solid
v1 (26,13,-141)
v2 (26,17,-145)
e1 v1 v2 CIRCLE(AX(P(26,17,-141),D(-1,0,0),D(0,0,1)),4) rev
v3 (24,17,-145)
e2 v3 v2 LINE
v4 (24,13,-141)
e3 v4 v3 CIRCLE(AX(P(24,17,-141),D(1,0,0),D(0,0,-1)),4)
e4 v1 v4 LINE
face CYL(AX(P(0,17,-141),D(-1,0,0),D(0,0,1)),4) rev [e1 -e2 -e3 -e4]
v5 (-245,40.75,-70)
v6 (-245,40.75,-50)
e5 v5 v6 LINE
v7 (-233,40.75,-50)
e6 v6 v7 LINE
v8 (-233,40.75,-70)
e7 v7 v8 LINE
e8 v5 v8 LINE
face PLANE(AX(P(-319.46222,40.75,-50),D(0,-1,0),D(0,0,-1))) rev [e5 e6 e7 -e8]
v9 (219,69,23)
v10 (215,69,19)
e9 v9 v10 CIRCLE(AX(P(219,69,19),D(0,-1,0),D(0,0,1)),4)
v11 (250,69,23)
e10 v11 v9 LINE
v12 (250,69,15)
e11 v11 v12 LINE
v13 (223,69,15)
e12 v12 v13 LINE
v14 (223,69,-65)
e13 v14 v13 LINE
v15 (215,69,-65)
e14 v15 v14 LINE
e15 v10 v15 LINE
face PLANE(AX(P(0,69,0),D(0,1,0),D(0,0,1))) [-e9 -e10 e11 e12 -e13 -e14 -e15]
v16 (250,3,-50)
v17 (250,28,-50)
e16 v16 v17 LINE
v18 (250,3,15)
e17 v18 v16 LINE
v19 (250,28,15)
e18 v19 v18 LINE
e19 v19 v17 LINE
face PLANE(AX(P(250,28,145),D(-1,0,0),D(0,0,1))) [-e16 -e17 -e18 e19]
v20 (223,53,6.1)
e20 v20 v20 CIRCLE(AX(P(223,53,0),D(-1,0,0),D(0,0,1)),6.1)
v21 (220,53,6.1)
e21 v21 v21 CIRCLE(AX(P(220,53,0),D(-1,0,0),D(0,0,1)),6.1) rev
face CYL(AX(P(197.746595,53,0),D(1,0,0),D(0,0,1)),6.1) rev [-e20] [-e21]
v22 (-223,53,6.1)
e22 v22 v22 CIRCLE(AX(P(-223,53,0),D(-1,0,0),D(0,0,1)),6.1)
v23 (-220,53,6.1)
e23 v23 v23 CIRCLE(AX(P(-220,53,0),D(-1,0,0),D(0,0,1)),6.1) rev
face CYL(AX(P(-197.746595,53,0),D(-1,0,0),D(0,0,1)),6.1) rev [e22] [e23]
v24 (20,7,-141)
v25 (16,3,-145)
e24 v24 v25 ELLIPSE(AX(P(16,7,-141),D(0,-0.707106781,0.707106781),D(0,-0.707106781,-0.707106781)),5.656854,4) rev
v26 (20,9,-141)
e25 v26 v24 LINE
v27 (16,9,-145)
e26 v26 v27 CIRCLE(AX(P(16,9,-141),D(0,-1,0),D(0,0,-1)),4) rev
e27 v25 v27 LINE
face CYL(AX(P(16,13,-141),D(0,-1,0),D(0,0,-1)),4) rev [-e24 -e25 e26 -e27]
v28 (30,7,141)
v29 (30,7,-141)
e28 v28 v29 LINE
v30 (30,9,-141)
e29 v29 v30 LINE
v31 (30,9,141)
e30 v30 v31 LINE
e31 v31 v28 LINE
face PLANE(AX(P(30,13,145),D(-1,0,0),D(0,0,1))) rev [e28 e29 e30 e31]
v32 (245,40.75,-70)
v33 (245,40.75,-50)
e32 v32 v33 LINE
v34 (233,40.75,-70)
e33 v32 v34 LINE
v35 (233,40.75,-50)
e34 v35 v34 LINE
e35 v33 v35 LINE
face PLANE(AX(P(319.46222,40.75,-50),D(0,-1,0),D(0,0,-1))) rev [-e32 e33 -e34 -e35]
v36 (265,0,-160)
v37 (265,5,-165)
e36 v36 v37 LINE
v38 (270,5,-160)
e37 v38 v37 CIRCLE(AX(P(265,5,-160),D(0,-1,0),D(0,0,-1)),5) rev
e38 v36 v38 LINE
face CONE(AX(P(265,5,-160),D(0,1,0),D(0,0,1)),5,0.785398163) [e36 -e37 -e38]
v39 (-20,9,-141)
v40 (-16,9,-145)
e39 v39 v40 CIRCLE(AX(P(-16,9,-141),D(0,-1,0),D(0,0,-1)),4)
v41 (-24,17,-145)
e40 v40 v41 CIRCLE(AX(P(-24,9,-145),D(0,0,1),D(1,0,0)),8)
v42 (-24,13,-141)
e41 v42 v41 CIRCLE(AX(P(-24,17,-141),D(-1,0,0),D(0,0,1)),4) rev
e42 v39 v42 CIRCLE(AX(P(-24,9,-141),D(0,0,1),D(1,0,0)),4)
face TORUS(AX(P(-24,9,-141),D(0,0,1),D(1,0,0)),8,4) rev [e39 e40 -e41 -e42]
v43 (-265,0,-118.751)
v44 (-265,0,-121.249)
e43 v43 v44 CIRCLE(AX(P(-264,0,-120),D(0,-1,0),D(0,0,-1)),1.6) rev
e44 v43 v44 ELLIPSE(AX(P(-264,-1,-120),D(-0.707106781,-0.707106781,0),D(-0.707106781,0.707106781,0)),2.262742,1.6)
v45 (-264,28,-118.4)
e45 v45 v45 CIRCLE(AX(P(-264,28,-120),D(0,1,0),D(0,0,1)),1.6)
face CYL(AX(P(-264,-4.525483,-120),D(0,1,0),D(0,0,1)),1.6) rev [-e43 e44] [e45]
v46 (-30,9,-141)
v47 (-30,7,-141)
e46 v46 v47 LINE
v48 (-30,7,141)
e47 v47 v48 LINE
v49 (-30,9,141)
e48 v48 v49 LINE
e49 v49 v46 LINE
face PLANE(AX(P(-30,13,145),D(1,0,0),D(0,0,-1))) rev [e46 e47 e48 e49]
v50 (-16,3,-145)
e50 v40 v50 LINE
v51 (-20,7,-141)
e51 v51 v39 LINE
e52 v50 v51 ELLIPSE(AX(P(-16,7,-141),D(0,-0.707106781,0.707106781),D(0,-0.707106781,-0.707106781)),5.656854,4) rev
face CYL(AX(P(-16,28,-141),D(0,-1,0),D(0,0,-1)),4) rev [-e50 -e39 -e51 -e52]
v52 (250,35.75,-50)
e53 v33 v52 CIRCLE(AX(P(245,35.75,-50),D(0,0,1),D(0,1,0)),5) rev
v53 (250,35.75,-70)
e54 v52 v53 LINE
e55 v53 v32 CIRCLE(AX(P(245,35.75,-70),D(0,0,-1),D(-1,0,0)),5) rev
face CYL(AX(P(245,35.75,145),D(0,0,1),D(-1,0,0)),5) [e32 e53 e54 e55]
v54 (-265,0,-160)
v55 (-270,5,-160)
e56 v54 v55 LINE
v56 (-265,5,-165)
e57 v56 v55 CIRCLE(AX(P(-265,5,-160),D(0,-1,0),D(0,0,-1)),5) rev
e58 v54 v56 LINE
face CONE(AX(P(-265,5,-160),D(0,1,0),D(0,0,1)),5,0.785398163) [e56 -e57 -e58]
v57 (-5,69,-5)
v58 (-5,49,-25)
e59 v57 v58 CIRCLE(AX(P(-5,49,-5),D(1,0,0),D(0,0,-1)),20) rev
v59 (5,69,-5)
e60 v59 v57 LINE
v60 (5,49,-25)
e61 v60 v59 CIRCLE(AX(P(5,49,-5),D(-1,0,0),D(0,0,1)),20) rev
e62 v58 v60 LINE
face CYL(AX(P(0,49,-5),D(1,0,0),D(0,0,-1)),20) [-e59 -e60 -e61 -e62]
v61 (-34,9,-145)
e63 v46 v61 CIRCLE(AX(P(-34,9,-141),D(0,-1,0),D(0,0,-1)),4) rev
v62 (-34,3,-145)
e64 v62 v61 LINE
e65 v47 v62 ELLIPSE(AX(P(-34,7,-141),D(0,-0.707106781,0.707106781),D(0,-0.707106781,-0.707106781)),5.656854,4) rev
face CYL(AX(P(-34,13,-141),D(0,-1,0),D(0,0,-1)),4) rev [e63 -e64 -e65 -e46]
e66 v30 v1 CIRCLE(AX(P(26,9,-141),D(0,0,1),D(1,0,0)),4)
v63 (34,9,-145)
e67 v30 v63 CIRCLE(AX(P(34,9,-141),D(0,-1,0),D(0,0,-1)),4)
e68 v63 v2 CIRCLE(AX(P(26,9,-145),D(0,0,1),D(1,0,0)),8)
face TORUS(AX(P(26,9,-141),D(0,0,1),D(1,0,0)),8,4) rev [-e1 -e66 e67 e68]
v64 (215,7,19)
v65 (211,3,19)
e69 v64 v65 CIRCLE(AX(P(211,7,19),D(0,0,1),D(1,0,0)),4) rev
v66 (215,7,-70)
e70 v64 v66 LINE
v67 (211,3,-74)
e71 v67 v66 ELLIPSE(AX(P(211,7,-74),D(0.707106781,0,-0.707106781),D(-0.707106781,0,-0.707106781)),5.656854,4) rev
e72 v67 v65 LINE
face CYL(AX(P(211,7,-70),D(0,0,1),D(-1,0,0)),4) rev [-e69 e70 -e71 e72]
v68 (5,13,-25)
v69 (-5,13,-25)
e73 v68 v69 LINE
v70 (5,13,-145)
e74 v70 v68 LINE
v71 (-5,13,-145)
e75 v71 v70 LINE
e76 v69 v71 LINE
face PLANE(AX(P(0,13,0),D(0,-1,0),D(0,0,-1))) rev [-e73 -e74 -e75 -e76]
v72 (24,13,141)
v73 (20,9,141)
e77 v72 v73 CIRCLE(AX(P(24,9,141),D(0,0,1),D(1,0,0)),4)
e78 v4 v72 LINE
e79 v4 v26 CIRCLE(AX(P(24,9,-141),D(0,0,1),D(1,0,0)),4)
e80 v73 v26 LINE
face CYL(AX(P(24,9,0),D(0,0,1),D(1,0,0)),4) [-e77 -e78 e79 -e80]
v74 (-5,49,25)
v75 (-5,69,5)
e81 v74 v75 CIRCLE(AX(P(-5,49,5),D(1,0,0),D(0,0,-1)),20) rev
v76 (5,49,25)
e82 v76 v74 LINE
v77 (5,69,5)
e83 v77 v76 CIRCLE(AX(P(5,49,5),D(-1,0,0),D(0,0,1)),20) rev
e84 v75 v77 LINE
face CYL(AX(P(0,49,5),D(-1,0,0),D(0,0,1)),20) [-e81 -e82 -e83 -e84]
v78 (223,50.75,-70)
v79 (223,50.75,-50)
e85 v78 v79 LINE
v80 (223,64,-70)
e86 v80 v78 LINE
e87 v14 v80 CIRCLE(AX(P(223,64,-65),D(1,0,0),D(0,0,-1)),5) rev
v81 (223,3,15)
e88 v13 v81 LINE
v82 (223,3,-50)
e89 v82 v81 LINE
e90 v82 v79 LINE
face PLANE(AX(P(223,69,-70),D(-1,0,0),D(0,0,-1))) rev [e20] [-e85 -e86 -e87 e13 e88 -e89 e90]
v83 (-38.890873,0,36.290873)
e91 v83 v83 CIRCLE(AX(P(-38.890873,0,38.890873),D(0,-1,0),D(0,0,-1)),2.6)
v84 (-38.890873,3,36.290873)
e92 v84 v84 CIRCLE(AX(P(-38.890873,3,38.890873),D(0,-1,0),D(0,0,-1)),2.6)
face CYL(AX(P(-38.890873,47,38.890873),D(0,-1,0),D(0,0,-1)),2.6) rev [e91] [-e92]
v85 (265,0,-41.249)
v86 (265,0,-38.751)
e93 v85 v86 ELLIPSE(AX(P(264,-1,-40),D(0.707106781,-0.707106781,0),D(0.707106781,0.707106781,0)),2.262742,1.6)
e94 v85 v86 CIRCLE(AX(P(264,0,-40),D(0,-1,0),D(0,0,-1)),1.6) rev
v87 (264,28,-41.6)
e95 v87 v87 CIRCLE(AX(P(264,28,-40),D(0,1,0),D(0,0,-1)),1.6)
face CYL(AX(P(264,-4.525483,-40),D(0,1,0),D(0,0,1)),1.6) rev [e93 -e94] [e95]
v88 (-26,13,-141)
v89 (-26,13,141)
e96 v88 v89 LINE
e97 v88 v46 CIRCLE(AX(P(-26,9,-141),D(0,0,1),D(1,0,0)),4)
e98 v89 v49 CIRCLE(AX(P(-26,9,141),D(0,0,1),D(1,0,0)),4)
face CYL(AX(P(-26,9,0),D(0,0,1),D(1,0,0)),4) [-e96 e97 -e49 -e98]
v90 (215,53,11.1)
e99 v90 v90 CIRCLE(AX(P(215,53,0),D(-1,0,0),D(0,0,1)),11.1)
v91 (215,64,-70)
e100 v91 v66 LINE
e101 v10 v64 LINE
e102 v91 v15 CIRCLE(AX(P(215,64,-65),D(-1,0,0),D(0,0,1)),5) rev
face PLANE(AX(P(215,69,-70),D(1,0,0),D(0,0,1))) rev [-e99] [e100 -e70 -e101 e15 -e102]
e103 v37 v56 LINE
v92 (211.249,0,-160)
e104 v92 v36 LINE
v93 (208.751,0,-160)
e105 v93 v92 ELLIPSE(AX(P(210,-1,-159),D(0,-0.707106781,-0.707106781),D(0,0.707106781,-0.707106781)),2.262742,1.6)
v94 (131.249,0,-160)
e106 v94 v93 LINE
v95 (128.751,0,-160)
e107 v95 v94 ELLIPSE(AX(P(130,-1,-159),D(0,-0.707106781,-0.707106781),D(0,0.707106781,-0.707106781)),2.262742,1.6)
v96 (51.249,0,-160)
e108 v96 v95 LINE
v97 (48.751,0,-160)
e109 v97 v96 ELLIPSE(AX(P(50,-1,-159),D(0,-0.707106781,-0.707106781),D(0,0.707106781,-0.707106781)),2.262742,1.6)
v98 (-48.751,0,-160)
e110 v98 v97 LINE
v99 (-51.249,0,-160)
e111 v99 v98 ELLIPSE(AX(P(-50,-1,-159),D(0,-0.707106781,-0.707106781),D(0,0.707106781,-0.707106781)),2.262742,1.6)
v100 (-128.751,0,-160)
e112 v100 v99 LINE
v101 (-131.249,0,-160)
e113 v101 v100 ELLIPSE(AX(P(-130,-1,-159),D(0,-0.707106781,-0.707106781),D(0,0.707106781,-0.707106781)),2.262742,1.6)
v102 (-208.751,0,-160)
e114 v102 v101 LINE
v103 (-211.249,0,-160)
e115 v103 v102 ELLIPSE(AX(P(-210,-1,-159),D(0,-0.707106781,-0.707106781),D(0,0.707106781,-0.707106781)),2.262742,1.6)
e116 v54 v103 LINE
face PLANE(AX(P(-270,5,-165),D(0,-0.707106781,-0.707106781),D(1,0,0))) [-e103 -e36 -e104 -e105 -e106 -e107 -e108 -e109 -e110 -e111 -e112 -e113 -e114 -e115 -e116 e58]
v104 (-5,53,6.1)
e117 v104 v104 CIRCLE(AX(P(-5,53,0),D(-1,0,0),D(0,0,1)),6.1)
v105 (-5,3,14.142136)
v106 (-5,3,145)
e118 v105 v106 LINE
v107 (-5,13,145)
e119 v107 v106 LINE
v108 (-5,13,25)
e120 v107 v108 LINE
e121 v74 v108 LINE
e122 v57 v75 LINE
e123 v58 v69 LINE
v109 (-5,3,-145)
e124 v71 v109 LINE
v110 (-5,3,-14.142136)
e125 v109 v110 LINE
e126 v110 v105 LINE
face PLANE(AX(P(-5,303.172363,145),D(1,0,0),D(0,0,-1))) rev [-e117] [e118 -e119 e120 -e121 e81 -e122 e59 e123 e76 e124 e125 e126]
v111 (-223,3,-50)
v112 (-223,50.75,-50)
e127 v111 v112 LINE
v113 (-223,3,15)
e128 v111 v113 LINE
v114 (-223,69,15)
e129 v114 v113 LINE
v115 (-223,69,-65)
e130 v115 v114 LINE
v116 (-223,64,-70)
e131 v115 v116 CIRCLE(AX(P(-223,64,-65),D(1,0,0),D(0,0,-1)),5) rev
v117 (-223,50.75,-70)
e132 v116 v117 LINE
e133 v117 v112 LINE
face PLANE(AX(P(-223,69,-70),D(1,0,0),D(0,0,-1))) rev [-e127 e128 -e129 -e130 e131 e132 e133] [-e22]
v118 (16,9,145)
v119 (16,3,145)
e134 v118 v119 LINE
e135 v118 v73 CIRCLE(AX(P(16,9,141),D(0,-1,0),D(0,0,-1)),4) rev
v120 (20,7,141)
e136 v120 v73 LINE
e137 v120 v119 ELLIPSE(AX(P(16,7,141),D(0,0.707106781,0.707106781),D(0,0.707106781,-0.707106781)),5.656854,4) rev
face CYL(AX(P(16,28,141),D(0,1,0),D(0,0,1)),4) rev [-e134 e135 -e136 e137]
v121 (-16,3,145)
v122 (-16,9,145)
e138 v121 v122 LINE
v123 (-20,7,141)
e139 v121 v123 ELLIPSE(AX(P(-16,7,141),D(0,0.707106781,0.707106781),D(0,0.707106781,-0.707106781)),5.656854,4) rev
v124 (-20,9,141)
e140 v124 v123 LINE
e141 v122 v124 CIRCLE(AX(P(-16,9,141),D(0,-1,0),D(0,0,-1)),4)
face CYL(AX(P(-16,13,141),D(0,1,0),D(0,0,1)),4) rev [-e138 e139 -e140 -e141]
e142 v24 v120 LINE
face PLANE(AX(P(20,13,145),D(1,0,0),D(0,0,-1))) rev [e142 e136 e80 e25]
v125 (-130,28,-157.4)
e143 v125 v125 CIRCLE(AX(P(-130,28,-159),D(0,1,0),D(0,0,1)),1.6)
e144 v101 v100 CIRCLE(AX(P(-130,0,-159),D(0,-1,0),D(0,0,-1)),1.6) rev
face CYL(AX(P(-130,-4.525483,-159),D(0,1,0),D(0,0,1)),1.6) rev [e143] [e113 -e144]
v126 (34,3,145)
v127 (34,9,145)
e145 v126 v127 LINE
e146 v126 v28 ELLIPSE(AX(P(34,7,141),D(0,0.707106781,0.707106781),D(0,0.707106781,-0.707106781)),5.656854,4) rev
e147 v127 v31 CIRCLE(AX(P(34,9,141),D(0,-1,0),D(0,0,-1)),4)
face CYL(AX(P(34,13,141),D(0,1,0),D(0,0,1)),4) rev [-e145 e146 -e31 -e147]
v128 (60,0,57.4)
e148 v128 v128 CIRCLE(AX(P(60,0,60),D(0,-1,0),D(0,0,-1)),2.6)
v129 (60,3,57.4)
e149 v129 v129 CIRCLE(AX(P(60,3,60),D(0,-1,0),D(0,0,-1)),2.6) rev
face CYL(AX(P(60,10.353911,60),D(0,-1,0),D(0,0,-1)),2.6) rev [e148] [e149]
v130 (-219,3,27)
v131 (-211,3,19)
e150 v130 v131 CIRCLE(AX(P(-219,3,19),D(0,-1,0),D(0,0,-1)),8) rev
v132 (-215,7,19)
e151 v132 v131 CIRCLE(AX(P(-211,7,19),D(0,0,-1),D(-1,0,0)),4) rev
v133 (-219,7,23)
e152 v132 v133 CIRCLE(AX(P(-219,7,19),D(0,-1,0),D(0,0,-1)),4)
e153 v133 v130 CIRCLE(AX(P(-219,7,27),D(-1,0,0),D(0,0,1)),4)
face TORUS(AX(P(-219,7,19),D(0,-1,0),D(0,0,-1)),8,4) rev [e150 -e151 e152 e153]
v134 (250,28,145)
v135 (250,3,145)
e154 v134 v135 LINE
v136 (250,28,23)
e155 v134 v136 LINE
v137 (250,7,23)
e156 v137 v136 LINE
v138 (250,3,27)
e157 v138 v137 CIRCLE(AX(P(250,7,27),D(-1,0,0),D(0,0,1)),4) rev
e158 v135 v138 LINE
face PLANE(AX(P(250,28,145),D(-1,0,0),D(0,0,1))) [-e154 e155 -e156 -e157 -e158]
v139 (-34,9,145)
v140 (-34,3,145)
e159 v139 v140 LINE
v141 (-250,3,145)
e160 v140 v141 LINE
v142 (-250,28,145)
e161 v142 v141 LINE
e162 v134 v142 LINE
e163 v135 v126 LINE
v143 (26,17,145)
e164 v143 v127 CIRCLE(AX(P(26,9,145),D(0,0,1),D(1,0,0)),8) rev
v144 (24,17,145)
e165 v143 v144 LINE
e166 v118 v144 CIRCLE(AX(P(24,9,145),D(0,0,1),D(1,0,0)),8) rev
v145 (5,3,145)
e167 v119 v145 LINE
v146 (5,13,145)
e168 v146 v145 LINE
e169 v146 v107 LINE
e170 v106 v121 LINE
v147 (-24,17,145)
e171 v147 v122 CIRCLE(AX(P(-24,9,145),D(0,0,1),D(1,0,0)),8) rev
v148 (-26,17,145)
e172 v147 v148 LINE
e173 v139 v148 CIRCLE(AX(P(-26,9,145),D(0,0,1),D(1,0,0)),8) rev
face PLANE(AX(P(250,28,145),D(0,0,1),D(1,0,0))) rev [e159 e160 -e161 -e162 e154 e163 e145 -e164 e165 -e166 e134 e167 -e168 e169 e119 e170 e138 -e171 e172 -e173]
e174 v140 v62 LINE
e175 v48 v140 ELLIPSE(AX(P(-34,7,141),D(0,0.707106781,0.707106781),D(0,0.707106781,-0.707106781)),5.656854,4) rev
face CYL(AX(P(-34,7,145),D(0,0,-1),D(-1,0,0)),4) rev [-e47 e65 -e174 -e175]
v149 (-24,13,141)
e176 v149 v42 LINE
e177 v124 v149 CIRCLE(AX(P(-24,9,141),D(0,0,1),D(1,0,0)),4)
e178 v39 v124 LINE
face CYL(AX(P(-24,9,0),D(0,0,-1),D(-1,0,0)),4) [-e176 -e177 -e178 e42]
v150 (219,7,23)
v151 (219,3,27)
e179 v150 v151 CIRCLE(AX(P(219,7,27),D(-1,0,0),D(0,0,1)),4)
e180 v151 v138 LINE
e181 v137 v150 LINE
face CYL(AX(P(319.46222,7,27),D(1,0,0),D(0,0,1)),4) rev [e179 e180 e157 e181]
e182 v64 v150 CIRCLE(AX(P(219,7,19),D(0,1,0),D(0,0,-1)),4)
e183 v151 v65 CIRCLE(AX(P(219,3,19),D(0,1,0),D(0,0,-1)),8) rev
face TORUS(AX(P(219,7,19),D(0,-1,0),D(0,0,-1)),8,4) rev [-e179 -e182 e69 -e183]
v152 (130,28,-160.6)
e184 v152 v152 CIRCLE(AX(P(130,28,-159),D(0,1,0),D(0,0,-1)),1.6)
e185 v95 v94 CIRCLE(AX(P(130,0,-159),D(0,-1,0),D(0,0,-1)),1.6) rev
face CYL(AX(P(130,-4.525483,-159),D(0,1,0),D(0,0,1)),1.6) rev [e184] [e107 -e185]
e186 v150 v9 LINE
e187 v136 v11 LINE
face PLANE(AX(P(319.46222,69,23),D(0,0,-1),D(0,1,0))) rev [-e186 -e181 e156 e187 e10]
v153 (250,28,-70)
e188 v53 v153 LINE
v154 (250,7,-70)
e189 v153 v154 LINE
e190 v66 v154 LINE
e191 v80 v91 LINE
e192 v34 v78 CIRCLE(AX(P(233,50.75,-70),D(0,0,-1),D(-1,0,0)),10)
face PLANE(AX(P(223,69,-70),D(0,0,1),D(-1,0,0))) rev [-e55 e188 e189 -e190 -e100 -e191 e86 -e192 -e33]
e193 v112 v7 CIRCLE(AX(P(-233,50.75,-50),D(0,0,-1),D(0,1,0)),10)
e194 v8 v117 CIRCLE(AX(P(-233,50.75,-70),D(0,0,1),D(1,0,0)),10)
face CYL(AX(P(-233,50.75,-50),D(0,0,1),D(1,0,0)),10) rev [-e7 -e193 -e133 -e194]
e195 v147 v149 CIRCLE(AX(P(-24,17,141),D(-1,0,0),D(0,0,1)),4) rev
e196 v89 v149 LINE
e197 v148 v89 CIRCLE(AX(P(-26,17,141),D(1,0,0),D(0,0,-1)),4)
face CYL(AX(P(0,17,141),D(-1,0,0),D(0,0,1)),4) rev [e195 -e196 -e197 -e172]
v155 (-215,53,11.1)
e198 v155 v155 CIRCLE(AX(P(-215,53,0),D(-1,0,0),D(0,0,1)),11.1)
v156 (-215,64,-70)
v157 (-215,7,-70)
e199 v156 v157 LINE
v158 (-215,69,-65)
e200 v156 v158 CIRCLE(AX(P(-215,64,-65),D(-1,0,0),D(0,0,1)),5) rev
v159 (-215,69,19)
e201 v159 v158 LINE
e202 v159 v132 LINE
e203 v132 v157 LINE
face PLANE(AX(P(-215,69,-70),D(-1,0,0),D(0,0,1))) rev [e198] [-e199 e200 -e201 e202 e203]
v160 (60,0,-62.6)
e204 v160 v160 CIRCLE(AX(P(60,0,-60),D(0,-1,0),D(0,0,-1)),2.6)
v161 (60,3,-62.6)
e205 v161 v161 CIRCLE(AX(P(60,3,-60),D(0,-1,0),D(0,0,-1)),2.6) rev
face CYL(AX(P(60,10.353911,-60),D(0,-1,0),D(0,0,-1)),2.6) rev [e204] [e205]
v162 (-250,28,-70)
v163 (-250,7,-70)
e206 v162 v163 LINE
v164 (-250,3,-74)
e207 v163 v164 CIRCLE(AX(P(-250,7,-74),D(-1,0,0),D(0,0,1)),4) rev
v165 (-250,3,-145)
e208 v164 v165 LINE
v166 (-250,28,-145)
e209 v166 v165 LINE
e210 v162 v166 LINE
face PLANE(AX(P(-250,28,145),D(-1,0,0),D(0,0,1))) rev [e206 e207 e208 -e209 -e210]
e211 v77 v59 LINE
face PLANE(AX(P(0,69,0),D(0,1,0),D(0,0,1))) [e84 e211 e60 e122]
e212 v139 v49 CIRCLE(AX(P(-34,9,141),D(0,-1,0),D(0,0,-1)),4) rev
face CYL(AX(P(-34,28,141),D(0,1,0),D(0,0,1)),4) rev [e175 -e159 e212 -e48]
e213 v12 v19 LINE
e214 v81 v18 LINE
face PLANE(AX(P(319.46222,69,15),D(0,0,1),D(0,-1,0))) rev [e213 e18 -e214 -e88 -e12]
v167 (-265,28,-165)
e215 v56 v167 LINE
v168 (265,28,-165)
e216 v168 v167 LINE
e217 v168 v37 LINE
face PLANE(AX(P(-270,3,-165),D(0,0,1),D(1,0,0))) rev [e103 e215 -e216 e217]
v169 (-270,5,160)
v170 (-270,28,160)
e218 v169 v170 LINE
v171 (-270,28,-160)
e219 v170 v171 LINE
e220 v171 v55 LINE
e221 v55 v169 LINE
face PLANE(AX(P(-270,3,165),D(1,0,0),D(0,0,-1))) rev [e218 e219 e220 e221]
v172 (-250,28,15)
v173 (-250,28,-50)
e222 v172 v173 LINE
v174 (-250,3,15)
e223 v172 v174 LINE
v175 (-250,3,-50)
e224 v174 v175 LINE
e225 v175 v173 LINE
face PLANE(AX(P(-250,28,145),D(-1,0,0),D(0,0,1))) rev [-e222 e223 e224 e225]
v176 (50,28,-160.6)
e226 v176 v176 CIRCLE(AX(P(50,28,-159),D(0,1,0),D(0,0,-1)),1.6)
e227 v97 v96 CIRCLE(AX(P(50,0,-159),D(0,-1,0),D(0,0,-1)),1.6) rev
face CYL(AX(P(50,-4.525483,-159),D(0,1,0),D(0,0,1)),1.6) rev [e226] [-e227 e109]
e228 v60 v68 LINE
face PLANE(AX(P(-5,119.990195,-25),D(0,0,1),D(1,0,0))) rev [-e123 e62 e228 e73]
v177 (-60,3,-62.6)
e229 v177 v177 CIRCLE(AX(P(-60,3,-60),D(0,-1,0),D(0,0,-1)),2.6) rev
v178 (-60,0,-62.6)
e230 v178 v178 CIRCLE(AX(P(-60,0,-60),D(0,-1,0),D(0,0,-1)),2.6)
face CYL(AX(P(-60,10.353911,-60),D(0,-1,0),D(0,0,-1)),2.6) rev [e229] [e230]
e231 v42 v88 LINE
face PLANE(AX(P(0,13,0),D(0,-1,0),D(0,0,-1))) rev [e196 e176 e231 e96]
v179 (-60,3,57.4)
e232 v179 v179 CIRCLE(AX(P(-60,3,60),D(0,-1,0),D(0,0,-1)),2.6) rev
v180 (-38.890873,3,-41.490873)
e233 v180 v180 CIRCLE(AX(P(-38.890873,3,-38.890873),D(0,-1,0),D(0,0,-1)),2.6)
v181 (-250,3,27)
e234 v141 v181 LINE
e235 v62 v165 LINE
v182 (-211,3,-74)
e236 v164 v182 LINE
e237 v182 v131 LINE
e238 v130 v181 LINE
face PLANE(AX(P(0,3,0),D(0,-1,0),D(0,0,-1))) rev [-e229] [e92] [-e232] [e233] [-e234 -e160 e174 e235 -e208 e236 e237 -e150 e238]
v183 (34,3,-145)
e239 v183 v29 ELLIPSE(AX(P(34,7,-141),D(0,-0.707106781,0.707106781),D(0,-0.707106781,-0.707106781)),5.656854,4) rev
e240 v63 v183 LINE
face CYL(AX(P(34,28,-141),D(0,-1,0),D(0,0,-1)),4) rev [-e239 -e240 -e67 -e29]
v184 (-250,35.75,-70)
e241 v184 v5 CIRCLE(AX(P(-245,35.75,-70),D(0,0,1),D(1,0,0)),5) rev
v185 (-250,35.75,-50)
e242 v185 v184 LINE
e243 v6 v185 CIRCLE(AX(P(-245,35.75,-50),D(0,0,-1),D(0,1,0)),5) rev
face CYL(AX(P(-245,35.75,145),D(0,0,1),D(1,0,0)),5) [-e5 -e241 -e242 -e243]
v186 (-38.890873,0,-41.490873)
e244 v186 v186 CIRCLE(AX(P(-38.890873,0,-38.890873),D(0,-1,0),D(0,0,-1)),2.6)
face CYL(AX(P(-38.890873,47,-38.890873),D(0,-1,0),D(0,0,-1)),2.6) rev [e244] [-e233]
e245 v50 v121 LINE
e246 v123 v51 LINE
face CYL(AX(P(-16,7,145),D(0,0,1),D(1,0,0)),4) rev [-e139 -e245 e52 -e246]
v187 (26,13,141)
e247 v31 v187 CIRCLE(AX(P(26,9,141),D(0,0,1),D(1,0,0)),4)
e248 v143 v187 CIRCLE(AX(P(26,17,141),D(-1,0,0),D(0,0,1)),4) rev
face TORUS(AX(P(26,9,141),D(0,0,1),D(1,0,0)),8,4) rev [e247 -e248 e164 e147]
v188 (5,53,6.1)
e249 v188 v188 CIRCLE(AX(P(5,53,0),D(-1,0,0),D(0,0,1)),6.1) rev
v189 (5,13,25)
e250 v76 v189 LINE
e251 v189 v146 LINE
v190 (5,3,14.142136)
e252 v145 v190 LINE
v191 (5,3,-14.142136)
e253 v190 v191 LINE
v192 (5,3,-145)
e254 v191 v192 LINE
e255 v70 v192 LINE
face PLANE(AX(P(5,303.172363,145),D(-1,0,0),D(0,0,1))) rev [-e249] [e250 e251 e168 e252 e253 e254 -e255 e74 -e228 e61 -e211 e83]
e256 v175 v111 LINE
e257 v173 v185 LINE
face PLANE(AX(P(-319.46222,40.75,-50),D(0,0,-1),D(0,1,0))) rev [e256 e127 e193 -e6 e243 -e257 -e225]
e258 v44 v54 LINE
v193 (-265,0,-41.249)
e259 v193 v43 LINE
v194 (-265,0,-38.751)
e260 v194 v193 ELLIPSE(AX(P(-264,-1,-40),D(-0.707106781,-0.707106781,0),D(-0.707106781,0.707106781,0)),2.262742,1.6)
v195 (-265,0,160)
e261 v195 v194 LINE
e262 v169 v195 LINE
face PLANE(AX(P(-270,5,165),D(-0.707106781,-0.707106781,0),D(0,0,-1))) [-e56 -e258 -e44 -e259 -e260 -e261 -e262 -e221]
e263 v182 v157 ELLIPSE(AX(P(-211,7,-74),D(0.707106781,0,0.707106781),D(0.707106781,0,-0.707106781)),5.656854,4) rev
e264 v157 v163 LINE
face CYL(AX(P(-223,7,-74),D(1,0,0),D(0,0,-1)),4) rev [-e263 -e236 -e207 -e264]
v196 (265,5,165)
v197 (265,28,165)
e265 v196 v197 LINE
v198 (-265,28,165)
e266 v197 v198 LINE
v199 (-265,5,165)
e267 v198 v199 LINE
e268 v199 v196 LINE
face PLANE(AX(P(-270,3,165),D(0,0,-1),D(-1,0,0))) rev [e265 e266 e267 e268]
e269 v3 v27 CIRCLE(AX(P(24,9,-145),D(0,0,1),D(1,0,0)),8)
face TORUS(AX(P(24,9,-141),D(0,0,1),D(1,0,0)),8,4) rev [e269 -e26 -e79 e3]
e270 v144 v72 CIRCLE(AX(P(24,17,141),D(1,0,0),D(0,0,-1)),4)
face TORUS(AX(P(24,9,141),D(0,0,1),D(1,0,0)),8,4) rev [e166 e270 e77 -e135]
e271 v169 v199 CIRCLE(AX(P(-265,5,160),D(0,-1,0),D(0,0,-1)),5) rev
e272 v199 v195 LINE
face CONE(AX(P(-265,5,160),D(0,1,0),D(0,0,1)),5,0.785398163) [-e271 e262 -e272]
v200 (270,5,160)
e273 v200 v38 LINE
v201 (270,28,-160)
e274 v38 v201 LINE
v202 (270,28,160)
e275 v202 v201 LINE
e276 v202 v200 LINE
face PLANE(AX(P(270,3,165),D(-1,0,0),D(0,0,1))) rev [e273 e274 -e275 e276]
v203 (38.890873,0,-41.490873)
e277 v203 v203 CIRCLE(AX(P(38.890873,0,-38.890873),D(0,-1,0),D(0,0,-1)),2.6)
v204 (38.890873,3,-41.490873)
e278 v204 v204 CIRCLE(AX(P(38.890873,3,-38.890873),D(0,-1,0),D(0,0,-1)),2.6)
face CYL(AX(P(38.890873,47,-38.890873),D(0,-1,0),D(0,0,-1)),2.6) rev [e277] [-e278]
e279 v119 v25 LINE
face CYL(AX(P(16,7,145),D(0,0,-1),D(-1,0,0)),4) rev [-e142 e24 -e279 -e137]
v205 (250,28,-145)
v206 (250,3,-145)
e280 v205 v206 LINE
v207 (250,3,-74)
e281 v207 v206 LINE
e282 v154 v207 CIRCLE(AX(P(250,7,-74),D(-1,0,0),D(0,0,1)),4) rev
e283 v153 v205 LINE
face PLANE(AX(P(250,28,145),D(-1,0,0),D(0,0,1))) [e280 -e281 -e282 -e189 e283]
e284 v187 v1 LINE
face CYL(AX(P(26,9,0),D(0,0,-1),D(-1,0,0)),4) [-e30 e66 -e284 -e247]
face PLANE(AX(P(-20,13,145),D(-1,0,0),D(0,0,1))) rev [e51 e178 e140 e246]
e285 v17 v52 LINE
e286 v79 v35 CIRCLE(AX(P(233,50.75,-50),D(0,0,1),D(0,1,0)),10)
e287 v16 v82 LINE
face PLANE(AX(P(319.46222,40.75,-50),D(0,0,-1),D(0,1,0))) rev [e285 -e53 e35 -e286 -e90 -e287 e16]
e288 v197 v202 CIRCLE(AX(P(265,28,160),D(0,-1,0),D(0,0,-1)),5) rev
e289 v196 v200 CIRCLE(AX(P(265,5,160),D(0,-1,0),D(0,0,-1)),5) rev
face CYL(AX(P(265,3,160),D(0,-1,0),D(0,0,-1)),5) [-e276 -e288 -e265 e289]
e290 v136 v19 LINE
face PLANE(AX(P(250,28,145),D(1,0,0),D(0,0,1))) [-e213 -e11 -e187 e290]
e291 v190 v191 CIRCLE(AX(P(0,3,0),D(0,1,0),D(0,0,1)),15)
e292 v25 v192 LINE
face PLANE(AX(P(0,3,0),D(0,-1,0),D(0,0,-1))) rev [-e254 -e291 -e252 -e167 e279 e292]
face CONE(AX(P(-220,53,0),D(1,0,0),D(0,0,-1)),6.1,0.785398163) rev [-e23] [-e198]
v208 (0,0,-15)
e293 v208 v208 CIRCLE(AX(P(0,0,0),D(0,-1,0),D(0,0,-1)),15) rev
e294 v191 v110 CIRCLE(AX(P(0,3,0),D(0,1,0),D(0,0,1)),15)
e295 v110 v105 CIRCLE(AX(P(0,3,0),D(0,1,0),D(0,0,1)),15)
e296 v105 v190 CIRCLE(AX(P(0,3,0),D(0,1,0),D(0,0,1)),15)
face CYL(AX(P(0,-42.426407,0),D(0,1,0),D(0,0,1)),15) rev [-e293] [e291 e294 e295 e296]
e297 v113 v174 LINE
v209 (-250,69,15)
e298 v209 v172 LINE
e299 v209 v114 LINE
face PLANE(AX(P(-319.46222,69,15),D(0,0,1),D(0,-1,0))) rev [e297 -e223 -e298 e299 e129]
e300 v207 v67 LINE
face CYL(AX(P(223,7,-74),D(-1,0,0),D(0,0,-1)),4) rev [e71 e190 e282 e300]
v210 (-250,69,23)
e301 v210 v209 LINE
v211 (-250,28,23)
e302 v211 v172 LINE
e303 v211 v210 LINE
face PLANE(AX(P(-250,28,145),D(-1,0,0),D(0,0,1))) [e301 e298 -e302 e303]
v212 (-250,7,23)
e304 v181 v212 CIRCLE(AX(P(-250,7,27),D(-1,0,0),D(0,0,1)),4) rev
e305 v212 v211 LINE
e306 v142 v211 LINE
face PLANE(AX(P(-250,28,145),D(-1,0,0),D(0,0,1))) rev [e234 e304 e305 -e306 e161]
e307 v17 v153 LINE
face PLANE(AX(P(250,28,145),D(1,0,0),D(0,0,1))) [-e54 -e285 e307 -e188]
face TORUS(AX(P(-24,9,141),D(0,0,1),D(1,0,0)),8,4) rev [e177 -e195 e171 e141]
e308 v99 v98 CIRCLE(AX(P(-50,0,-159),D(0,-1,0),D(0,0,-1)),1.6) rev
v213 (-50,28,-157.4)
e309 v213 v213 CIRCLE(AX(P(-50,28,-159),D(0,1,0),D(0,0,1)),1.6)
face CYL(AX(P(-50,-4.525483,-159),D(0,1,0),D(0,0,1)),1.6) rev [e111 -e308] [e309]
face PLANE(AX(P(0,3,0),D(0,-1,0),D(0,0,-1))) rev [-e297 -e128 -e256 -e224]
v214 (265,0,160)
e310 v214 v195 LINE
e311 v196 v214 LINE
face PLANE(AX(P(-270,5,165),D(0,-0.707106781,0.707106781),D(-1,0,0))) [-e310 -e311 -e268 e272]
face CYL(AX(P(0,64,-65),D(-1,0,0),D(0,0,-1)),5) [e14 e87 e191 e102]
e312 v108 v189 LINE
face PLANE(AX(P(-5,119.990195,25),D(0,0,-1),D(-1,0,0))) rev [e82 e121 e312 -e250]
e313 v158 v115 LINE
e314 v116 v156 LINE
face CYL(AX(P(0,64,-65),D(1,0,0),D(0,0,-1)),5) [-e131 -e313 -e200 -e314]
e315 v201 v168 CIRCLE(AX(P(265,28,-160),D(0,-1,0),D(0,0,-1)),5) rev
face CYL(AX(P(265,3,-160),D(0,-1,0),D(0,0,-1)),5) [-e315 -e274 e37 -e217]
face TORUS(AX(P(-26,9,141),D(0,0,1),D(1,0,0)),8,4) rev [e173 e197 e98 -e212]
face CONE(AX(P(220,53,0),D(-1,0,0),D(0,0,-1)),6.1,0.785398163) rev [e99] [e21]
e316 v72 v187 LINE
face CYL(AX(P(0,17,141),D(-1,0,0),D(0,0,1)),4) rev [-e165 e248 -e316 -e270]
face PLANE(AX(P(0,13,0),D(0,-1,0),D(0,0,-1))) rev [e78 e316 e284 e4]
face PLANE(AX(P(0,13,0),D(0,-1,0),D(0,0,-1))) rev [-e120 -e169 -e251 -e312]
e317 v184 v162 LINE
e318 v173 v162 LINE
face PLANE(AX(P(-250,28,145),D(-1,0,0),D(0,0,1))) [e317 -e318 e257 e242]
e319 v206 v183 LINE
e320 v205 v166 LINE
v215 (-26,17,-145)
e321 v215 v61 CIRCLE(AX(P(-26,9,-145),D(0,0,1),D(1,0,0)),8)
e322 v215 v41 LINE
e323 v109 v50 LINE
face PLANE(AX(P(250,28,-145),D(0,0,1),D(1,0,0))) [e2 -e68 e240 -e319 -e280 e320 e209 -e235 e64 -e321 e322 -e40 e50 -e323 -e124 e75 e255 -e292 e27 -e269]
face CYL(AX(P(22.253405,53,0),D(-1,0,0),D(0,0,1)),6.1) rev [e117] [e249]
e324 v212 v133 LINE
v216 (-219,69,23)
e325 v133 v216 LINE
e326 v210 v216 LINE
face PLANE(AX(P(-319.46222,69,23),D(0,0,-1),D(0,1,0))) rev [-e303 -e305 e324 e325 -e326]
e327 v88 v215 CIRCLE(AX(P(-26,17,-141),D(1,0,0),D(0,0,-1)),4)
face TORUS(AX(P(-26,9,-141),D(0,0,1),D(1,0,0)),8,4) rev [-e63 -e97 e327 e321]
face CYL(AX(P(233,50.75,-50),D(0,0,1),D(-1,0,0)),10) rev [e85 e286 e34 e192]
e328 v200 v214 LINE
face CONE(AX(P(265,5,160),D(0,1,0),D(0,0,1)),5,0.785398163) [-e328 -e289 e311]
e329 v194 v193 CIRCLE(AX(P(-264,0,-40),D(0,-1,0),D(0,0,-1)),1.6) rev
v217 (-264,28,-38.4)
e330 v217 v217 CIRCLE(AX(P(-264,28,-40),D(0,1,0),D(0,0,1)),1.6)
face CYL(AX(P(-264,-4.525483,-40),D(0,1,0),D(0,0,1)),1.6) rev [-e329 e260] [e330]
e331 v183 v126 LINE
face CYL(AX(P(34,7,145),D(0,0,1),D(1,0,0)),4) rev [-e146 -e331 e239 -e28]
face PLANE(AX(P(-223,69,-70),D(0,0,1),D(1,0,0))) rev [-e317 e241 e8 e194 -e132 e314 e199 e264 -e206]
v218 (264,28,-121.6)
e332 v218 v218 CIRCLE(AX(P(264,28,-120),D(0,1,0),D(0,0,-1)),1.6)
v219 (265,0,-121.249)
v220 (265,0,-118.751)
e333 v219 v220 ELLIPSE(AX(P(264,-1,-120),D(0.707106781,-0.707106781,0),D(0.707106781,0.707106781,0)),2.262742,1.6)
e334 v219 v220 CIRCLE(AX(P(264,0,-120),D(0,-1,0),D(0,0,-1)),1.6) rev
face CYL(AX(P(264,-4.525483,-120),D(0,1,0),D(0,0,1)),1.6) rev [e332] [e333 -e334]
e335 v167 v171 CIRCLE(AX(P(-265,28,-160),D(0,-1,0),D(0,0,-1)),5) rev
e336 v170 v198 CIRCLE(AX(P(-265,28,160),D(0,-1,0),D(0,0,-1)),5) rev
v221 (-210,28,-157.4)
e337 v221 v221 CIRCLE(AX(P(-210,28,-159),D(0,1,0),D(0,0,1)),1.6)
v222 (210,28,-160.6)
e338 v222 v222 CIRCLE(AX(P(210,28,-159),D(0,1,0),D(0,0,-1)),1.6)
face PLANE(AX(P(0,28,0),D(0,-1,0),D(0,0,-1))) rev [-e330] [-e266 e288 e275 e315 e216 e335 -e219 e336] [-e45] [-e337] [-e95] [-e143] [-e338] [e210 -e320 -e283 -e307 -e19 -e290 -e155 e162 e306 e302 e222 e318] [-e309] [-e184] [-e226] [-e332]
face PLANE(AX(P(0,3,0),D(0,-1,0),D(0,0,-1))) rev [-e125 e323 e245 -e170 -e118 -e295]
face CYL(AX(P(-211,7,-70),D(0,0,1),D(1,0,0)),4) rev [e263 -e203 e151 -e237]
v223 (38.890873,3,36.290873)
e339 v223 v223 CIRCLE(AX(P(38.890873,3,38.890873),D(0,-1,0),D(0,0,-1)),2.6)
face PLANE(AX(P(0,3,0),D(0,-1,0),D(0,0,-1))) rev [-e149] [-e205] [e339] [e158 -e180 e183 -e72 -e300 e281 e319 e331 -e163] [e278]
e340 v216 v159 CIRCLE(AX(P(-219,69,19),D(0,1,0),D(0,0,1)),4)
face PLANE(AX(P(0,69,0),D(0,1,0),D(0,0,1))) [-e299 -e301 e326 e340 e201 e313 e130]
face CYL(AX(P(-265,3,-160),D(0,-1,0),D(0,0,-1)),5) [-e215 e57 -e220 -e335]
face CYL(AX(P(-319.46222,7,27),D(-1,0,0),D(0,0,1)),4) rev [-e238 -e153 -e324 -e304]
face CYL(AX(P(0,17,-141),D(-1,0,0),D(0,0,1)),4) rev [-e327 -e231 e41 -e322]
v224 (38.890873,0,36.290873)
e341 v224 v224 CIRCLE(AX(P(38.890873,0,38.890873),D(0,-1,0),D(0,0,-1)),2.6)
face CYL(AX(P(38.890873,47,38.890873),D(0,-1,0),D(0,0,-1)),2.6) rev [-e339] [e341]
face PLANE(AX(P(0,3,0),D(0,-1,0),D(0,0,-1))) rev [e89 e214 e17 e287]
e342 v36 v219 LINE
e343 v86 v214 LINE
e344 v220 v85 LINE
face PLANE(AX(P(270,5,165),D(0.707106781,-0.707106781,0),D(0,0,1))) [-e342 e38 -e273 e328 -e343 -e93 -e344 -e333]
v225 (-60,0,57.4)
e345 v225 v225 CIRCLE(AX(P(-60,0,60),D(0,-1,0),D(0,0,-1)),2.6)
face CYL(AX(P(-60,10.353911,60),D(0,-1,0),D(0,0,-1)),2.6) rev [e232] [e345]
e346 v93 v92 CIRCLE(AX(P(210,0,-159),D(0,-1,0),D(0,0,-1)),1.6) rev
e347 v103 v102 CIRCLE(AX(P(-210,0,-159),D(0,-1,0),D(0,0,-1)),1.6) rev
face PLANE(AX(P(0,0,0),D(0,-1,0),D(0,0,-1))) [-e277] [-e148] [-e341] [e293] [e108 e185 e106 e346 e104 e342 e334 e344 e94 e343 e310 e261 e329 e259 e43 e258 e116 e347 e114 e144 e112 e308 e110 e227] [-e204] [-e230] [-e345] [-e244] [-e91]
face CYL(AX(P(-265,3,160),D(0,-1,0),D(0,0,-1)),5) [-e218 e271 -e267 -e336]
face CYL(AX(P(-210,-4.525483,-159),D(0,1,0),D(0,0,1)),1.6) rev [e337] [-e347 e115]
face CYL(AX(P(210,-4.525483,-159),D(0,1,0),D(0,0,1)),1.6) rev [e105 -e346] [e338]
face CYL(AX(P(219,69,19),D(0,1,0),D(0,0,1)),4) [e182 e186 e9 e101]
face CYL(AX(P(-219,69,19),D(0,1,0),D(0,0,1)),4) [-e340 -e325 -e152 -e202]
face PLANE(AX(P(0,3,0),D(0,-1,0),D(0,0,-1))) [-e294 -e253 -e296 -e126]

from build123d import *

# Parameters (mm, degrees)
SKETCH1_W           = 540
SKETCH1_H           = 330
BOSS_EXTRUDE1_DEPTH = 3
SKETCH2_W           = 540
SKETCH2_H           = 330
SKETCH2_W_2         = 500
SKETCH2_H_2         = 290
BOSS_EXTRUDE2_DEPTH = 25
FILLET1_R           = 5
SKETCH4_R           = 1.6
CUT_EXTRUDE1_DEPTH  = 28
SKETCH5_R           = 15
CUT_EXTRUDE2_DEPTH  = 3
SKETCH6_W           = 10
SKETCH6_H           = 290
BOSS_EXTRUDE3_DEPTH = 10
FILLET3_R           = 4
CHAMFER1_SIZE       = 5
SKETCH7_R           = 2.6
CUT_EXTRUDE3_DEPTH  = 3
SKETCH9_R           = 2.6
CUT_EXTRUDE4_DEPTH  = 47
SKETCH11_W          = 8
SKETCH11_H          = 140
BOSS_EXTRUDE4_DEPTH = 66
SKETCH12_R          = 6.1
CUT_EXTRUDE5_DEPTH  = 8
SKETCH13_W          = 8
SKETCH13_H          = 69
SKETCH13_W_2        = 20
SKETCH13_H_2        = 40.75
BOSS_EXTRUDE5_DEPTH = 27
SKETCH15_W          = 8
SKETCH15_H          = 47
CUT_EXTRUDE6_DEPTH  = 66
FILLET4_R           = 4
FILLET5_R           = 10
FILLET6_R           = 5
FILLET7_R           = 5
CHAMFER2_SIZE       = 5
SKETCH19_W          = 10
SKETCH19_H          = 290
BOSS_EXTRUDE6_DEPTH = 10
SKETCH20_W          = 10
SKETCH20_H          = 50
BOSS_EXTRUDE7_DEPTH = 56
FILLET8_R           = 20
SKETCH21_R          = 6.1
CUT_EXTRUDE7_DEPTH  = 10


with BuildPart() as part:
    # Sketch1 → Boss-Extrude1 (new body)
    with BuildSketch(Plane(origin=(0, 0, 0), x_dir=(1, 0, 0), z_dir=(0, 1, 0))):
        Rectangle(SKETCH1_W, SKETCH1_H)
    extrude(amount=BOSS_EXTRUDE1_DEPTH)

    # Sketch2 → Boss-Extrude2 (add)
    with BuildSketch(Plane(origin=(0, 3, 0), x_dir=(1, 0, 0), z_dir=(0, 1, 0))):
        Rectangle(SKETCH2_W, SKETCH2_H)
        Rectangle(SKETCH2_W_2, SKETCH2_H_2, mode=Mode.SUBTRACT)
    extrude(amount=BOSS_EXTRUDE2_DEPTH)

    # Fillet1
    fillet1_edges = [part.edges().sort_by_distance(p)[0] for p in [
        (270, 14, 165),
        (-270, 14, 165),
        (-270, 14, -165),
        (270, 14, -165),
    ]]
    fillet(fillet1_edges, radius=FILLET1_R)

    # Sketch4 → Cut-Extrude1 (cut)
    with BuildSketch(Plane(origin=(0, 28, 0), x_dir=(1, 0, 0), z_dir=(0, 1, 0))):
        with Locations(Location((-264, 120, 0), (0, 0, 270))):
            Circle(SKETCH4_R)
        with Locations(Location((-264, 40, 0), (0, 0, 270))):
            Circle(SKETCH4_R)
        with Locations(Location((-210, 159, 0), (0, 0, 270))):
            Circle(SKETCH4_R)
        with Locations(Location((-130, 159, 0), (0, 0, 270))):
            Circle(SKETCH4_R)
        with Locations(Location((-50, 159, 0), (0, 0, 270))):
            Circle(SKETCH4_R)
        with Locations(Location((50, 159, 0), (0, 0, 90))):
            Circle(SKETCH4_R)
        with Locations(Location((130, 159, 0), (0, 0, 90))):
            Circle(SKETCH4_R)
        with Locations(Location((210, 159, 0), (0, 0, 90))):
            Circle(SKETCH4_R)
        with Locations(Location((264, 40, 0), (0, 0, 90))):
            Circle(SKETCH4_R)
        with Locations(Location((264, 120, 0), (0, 0, 90))):
            Circle(SKETCH4_R)
    extrude(amount=-CUT_EXTRUDE1_DEPTH, mode=Mode.SUBTRACT)

    # Sketch5 → Cut-Extrude2 (cut)
    with BuildSketch(Plane(origin=(0, 3, 0), x_dir=(1, 0, 0), z_dir=(0, 1, 0))):
        with Locations(Location((0, 0, 0), (0, 0, 270))):
            Circle(SKETCH5_R)
    extrude(amount=-CUT_EXTRUDE2_DEPTH, mode=Mode.SUBTRACT)

    # Sketch6 → Boss-Extrude3 (add)
    with BuildSketch(Plane(origin=(0, 3, 0), x_dir=(1, 0, 0), z_dir=(0, 1, 0))):
        with Locations((25, 0)):
            Rectangle(SKETCH6_W, SKETCH6_H)
        with Locations((-25, 0)):
            Rectangle(SKETCH6_W, SKETCH6_H)
    extrude(amount=BOSS_EXTRUDE3_DEPTH)

    # Fillet3
    fillet3_edges = [part.edges().sort_by_distance(p)[0] for p in [
        (30, 3, 0),
        (30, 8, 145),
        (30, 8, -145),
        (20, 3, 0),
        (20, 8, -145),
        (20, 8, 145),
        (30, 13, 0),
        (25, 13, -145),
        (20, 13, 0),
        (25, 13, 145),
        (-20, 3, 0),
        (-20, 8, 145),
        (-20, 8, -145),
        (-30, 3, 0),
        (-30, 8, -145),
        (-30, 8, 145),
        (-20, 13, 0),
        (-25, 13, -145),
        (-30, 13, 0),
        (-25, 13, 145),
    ]]
    fillet(fillet3_edges, radius=FILLET3_R)

    # Chamfer1
    # the kernel refuses this chamfer: 5 mm, written as the material it takes off along each edge
    with BuildSketch(Plane(origin=(-270, 0, -160), x_dir=(0, 1, 0), z_dir=(0, 0, 1)), Plane(origin=(270, 0, 160), x_dir=(0, 1, 0), z_dir=(0, 0, -1))) as chamfer1_piece_1:
        Polygon((CHAMFER1_SIZE, 0), (0, -CHAMFER1_SIZE), (0, 0), align=None)
    extrude(amount=320, mode=Mode.SUBTRACT)
    with BuildSketch(Plane(origin=(-265, 0, 165), x_dir=(0, 1, 0), z_dir=(1, 0, 0)), Plane(origin=(265, 0, -165), x_dir=(0, 1, 0), z_dir=(-1, 0, 0))) as chamfer1_piece_2:
        Polygon((CHAMFER1_SIZE, 0), (0, -CHAMFER1_SIZE), (0, 0), align=None)
    extrude(amount=530, mode=Mode.SUBTRACT)
    with BuildSketch(Plane(origin=(265, 0, -160), x_dir=(0, 0, -1), z_dir=(-1, 0, 0))) as chamfer1_piece_3:
        Polygon((5, -CHAMFER1_SIZE), (5 - CHAMFER1_SIZE, 0), (5, 0), align=None)
    revolve(axis=Axis((265, 0, -160), (0, -1, 0)), revolution_arc=90, mode=Mode.SUBTRACT)
    with BuildSketch(Plane(origin=(265, 0, 160), x_dir=(0, 0, 1), z_dir=(-1, 0, 0))) as chamfer1_piece_4:
        Polygon((5, CHAMFER1_SIZE), (5 - CHAMFER1_SIZE, 0), (5, 0), align=None)
    revolve(axis=Axis((265, 0, 160), (0, 1, 0)), revolution_arc=90, mode=Mode.SUBTRACT)
    with BuildSketch(Plane(origin=(-265, 0, 160), x_dir=(0, 0, 1), z_dir=(1, 0, 0))) as chamfer1_piece_5:
        Polygon((5, -CHAMFER1_SIZE), (5 - CHAMFER1_SIZE, 0), (5, 0), align=None)
    revolve(axis=Axis((-265, 0, 160), (0, -1, 0)), revolution_arc=90, mode=Mode.SUBTRACT)
    with BuildSketch(Plane(origin=(-265, 0, -160), x_dir=(0, 0, -1), z_dir=(1, 0, 0))) as chamfer1_piece_6:
        Polygon((5, CHAMFER1_SIZE), (5 - CHAMFER1_SIZE, 0), (5, 0), align=None)
    revolve(axis=Axis((-265, 0, -160), (0, 1, 0)), revolution_arc=90, mode=Mode.SUBTRACT)

    # Sketch7 → Cut-Extrude3 (cut)
    with BuildSketch(Plane.XZ):
        with Locations(Location((-60, 60, 0), (0, 0, 270))):
            Circle(SKETCH7_R)
        with Locations(Location((60, 60, 0), (0, 0, 270))):
            Circle(SKETCH7_R)
        with Locations(Location((60, -60, 0), (0, 0, 270))):
            Circle(SKETCH7_R)
        with Locations(Location((-60, -60, 0), (0, 0, 270))):
            Circle(SKETCH7_R)
    extrude(amount=-CUT_EXTRUDE3_DEPTH, mode=Mode.SUBTRACT)

    # Sketch9 → Cut-Extrude4 (cut)
    with BuildSketch(Plane.XZ):
        with Locations(Location((-38.890872965, 38.890872965, 0), (0, 0, 270))):
            Circle(SKETCH9_R)
        with Locations(Location((38.890872965, 38.890872965, 0), (0, 0, 270))):
            Circle(SKETCH9_R)
        with Locations(Location((38.890872965, -38.890872965, 0), (0, 0, 270))):
            Circle(SKETCH9_R)
        with Locations(Location((-38.890872965, -38.890872965, 0), (0, 0, 270))):
            Circle(SKETCH9_R)
    extrude(amount=-CUT_EXTRUDE4_DEPTH, mode=Mode.SUBTRACT)

    # Sketch11 → Boss-Extrude4 (add)
    with BuildSketch(Plane(origin=(0, 3, 0), x_dir=(1, 0, 0), z_dir=(0, 1, 0))):
        with Locations((-219, 0)):
            Rectangle(SKETCH11_W, SKETCH11_H)
    extrude(amount=BOSS_EXTRUDE4_DEPTH)

    # Sketch12 → Cut-Extrude5 (cut)
    with BuildSketch(Plane.ZY.offset(223)):
        with Locations((0, 53)):
            Circle(SKETCH12_R)
    extrude(amount=-CUT_EXTRUDE5_DEPTH, mode=Mode.SUBTRACT)

    # Sketch13 → Boss-Extrude5 (add)
    with BuildSketch(Plane.ZY.offset(223)):
        with Locations((19, 34.5)):
            Rectangle(SKETCH13_W, SKETCH13_H)
        with Locations((-60, 20.375)):
            Rectangle(SKETCH13_W_2, SKETCH13_H_2)
    extrude(amount=BOSS_EXTRUDE5_DEPTH)

    # Sketch15 → Cut-Extrude6 (cut)
    with BuildSketch(Plane(origin=(0, 69, 0), x_dir=(1, 0, 0), z_dir=(0, 1, 0))):
        with Locations((-219, -46.5)):
            Rectangle(SKETCH15_W, SKETCH15_H)
    extrude(amount=-CUT_EXTRUDE6_DEPTH, mode=Mode.SUBTRACT)

    # Fillet4
    fillet4_edges = [part.edges().sort_by_distance(p)[0] for p in [
        (-232.5, 3, -70),
        (-232.5, 3, 23),
        (-215, 3, -23.5),
        (-215, 36, 23),
    ]]
    fillet(fillet4_edges, radius=FILLET4_R)

    # Fillet5
    fillet5_edges = [part.edges().sort_by_distance(p)[0] for p in [
        (-223, 40.75, -60),
    ]]
    fillet(fillet5_edges, radius=FILLET5_R)

    # Fillet6
    fillet6_edges = [part.edges().sort_by_distance(p)[0] for p in [
        (-250, 40.75, -60),
    ]]
    fillet(fillet6_edges, radius=FILLET6_R)

    # Fillet7
    fillet7_edges = [part.edges().sort_by_distance(p)[0] for p in [
        (-219, 69, -70),
    ]]
    fillet(fillet7_edges, radius=FILLET7_R)

    # Chamfer2
    chamfer2_edges = [part.edges().sort_by_distance(p)[0] for p in [
        (-215, 53, -6.1),
    ]]
    chamfer(chamfer2_edges, length=CHAMFER2_SIZE)

    # Mirror9: part across plane


with BuildPart() as part_1:
    add(part.part)
    add(part.part.mirror(Plane(origin=(0, 0, 0), x_dir=(0, 0, 1), z_dir=(1, 0, 0))))

    # Sketch19 → Boss-Extrude6 (add)
    with BuildSketch(Plane(origin=(0, 3, 0), x_dir=(1, 0, 0), z_dir=(0, 1, 0))):
        Rectangle(SKETCH19_W, SKETCH19_H)
    extrude(amount=BOSS_EXTRUDE6_DEPTH)

    # Sketch20 → Boss-Extrude7 (add)
    with BuildSketch(Plane(origin=(0, 13, 0), x_dir=(1, 0, 0), z_dir=(0, 1, 0))):
        Rectangle(SKETCH20_W, SKETCH20_H)
    extrude(amount=BOSS_EXTRUDE7_DEPTH)

    # Fillet8
    fillet8_edges = [part_1.edges().sort_by_distance(p)[0] for p in [
        (0, 69, 25),
        (0, 69, -25),
    ]]
    fillet(fillet8_edges, radius=FILLET8_R)

    # Sketch21 → Cut-Extrude7 (cut)
    with BuildSketch(Plane.ZY.offset(5)):
        with Locations((0, 53)):
            Circle(SKETCH21_R)
    extrude(amount=-CUT_EXTRUDE7_DEPTH, mode=Mode.SUBTRACT)


solid = part_1.part
